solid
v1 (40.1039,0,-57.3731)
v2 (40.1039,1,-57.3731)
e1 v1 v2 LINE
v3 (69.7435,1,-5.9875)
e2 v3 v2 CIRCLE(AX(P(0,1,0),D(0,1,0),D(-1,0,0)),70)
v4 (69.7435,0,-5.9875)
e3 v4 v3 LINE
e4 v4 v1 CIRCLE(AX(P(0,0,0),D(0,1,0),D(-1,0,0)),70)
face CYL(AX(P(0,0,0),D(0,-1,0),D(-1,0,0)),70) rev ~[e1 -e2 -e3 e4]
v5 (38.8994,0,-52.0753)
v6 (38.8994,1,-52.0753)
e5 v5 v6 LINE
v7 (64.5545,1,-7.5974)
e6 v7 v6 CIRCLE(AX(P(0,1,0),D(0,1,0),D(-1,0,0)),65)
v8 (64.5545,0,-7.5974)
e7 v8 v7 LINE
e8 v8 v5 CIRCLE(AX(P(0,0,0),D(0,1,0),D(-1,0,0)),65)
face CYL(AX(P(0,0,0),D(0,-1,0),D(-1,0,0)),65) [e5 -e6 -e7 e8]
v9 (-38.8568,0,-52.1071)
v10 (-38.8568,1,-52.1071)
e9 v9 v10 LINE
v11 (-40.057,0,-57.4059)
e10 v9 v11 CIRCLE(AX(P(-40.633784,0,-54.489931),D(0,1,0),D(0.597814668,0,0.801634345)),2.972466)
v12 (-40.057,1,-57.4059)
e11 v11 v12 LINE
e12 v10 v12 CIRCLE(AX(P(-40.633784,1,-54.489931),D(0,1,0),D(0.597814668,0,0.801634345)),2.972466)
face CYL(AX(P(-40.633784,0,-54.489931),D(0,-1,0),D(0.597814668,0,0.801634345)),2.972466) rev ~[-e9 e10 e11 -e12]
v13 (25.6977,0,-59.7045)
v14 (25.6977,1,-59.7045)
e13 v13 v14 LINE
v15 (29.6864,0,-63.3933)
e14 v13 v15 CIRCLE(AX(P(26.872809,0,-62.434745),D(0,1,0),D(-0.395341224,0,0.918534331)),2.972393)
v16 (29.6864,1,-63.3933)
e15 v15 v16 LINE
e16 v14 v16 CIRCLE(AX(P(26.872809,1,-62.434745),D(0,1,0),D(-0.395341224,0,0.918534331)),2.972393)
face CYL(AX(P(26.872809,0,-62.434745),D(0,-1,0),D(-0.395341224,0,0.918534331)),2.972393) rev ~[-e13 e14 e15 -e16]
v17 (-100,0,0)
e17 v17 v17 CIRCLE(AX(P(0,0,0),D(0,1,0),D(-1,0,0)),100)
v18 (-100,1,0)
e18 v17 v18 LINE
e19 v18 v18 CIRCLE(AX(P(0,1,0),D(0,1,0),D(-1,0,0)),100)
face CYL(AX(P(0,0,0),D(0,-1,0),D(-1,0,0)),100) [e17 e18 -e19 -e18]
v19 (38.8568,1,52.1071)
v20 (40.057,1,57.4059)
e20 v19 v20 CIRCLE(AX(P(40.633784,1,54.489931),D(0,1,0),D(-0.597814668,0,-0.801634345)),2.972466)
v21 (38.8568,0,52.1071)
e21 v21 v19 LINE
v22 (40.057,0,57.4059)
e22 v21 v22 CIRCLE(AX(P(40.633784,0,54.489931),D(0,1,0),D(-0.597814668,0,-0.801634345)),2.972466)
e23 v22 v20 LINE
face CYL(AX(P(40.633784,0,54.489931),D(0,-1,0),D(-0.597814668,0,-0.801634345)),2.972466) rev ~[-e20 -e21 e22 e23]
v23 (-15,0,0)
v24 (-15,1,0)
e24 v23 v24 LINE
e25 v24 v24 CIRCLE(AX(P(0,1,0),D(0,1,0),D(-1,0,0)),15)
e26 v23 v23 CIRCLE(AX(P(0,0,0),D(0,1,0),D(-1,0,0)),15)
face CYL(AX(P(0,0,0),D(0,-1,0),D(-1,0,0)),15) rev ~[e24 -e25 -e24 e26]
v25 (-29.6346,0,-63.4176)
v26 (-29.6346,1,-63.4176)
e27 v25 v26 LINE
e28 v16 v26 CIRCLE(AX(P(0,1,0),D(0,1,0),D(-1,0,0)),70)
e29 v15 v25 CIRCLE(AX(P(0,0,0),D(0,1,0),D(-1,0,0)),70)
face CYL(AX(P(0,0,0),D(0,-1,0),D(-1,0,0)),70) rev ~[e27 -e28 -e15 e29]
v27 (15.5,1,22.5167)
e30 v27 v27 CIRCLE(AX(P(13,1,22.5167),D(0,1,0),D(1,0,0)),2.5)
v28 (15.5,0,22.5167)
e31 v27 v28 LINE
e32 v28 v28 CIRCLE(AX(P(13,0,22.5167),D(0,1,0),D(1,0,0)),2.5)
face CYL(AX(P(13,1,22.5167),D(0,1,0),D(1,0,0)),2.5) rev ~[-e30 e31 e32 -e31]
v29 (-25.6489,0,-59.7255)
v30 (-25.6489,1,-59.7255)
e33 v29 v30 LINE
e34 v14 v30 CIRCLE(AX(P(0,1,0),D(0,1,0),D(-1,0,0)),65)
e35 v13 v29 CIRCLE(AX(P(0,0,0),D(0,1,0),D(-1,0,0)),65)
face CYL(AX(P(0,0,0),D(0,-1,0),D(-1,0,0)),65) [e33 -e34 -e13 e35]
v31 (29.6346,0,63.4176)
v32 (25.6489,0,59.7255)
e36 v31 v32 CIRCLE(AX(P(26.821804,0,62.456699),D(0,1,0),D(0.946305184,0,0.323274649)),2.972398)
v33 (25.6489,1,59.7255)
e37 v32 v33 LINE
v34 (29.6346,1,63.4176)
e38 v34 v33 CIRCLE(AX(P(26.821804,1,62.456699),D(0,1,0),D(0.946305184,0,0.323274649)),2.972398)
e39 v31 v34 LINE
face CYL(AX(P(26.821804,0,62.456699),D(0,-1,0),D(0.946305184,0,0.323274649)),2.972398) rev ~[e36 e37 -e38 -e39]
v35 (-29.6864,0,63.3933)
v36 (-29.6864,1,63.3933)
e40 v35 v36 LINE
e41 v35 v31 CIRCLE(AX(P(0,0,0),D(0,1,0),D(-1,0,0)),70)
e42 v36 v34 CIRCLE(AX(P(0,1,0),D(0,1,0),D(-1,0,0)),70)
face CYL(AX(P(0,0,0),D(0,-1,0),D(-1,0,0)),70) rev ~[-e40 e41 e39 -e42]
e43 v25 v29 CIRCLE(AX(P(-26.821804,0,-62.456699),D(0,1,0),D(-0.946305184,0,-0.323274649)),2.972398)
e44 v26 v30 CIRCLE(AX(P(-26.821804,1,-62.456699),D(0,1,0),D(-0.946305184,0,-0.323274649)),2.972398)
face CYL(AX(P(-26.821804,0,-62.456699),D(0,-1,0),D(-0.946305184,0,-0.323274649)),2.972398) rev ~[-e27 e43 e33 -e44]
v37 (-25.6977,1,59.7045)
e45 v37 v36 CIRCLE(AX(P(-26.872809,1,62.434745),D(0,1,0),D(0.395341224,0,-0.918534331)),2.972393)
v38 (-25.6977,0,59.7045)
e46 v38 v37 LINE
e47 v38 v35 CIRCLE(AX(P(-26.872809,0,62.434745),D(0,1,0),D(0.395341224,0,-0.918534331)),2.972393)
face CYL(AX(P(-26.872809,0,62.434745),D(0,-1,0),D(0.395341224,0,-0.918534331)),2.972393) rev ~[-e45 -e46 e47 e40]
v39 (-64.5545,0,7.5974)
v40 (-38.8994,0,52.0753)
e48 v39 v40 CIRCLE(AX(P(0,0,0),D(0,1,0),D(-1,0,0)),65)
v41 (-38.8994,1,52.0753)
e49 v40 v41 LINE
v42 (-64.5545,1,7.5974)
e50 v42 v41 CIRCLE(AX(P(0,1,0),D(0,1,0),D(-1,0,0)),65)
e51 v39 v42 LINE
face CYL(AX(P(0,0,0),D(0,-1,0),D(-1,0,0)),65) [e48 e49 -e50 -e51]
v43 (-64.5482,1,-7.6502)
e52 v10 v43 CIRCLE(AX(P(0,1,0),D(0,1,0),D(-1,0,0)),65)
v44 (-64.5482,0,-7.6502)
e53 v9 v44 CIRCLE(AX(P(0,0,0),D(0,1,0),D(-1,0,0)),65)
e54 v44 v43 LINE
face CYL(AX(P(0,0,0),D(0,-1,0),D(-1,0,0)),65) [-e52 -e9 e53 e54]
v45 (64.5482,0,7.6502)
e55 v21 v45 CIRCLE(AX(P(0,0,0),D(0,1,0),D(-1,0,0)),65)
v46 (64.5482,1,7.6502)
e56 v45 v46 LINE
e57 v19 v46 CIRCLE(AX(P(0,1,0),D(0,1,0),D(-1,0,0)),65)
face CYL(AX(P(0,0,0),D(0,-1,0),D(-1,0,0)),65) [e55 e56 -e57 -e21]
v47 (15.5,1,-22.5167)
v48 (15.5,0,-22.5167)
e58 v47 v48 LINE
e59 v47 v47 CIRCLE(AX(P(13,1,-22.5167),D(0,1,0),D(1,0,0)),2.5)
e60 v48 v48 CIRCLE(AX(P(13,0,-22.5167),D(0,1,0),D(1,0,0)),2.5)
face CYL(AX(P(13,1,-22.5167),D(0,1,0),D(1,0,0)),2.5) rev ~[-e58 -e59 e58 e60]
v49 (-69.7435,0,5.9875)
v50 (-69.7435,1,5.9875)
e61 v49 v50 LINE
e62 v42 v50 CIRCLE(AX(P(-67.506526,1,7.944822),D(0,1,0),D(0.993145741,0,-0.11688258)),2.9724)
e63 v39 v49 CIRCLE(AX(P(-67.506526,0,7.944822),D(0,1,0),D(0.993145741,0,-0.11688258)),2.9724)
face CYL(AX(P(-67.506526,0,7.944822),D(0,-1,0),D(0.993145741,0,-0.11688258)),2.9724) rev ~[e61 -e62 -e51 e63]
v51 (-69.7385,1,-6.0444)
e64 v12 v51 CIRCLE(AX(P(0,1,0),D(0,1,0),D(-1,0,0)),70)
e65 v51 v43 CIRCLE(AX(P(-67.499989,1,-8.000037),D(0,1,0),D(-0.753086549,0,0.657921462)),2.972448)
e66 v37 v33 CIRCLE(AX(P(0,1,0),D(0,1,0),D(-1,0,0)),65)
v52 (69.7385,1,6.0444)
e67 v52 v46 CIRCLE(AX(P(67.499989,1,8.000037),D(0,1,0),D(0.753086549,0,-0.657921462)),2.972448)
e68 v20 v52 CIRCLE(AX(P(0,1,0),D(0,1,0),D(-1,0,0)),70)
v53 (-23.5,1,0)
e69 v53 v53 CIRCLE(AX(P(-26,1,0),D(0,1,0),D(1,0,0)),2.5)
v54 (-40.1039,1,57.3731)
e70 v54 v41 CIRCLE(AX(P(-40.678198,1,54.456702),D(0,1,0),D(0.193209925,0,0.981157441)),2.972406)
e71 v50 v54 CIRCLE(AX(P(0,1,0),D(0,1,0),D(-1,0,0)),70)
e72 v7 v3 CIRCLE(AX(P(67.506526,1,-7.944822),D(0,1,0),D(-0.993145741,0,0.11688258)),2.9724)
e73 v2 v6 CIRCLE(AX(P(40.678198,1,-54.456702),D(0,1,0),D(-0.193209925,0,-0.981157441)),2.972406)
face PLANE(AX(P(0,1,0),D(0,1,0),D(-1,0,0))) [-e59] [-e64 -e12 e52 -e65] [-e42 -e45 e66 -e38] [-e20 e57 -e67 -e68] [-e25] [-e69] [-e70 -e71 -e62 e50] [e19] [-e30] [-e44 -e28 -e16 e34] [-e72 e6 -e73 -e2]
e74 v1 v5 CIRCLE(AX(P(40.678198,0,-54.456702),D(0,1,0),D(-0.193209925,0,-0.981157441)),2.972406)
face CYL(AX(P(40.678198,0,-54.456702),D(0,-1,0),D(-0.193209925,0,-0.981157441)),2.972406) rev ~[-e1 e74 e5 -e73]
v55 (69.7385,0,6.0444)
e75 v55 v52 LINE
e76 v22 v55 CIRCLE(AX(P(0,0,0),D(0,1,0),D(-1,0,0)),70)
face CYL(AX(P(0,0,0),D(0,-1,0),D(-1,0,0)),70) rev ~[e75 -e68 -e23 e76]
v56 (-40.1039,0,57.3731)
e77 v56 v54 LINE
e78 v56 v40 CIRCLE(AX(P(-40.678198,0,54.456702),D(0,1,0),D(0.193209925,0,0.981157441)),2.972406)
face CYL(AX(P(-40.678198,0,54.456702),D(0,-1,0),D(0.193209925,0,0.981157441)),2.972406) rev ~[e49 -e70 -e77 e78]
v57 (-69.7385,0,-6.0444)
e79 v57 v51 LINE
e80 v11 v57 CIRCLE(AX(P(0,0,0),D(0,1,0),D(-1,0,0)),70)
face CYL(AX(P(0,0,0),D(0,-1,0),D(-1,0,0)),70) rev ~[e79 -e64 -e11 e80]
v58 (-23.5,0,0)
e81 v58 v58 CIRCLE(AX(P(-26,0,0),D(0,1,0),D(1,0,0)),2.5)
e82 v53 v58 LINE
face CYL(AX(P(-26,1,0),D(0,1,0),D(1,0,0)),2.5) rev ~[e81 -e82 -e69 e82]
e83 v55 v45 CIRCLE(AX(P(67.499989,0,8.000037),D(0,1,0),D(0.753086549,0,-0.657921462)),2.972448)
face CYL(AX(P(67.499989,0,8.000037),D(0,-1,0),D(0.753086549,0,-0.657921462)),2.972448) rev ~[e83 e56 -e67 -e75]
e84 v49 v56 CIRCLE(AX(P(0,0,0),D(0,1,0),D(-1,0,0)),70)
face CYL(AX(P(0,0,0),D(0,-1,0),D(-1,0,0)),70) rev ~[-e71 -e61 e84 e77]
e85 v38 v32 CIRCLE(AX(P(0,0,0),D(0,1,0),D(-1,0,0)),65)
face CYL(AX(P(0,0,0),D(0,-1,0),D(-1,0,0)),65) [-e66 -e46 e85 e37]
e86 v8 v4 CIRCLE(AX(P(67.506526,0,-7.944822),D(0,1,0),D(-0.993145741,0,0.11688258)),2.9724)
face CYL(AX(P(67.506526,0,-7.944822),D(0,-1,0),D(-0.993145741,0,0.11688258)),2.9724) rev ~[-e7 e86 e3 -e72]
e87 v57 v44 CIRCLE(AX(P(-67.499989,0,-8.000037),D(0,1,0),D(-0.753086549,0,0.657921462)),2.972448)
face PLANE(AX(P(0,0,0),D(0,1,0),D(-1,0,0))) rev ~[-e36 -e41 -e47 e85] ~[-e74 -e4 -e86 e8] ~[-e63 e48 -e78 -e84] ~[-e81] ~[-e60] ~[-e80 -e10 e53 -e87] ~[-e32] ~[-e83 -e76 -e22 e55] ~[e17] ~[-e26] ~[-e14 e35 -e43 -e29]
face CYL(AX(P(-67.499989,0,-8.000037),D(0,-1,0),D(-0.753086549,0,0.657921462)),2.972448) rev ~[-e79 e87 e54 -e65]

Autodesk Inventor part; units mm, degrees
ref_plane "YZ Plane" through (0, 0, 0) normal (1, 0, 0) x (0, 1, 0)
ref_plane "XZ Plane" through (0, 0, 0) normal (0, 1, 0) x (-1, 0, 0)
ref_plane "XY Plane" through (0, 0, 0) normal (0, 0, 1) x (1, 0, 0)
sketch "Szkic1" plane through (0, 0, 0) normal (0, 1, 0) x (-1, 0, 0)
  circle A0 centre (0, 0) radius 15
  circle A1 centre (0, 0) radius 40
  circle A2 centre (0, 0) radius 100
  circle A3 centre (0, 0) radius 70
  circle A4 centre (0, 0) radius 65
  line L0 (70, 0) -> (65, 0)
  arc A5 (64.5545, 7.5974) -> (69.7435, 5.9875) centre (67.5065, 7.9448) ccw
  arc A6 (69.7385, -6.0444) -> (64.5482, -7.6502) centre (67.5, -8) ccw
  arc A7 (40.1039, 57.3731) -> (38.8994, 52.0753) centre (40.6782, 54.4567) ccw
  arc A8 (25.6977, 59.7045) -> (29.6864, 63.3933) centre (26.8728, 62.4348) ccw
  arc A9 (-29.6346, 63.4176) -> (-25.6489, 59.7255) centre (-26.8218, 62.4567) ccw
  arc A10 (-38.8568, 52.1071) -> (-40.057, 57.4059) centre (-40.6337, 54.4899) ccw
  arc A11 (-69.7385, 6.0444) -> (-64.5482, 7.6502) centre (-67.5, 8) ccw
  arc A12 (-64.5545, -7.5974) -> (-69.7435, -5.9875) centre (-67.5065, -7.9448) ccw
  arc A13 (-40.1039, -57.3731) -> (-38.8994, -52.0753) centre (-40.6782, -54.4567) ccw
  arc A14 (-25.6977, -59.7045) -> (-29.6864, -63.3933) centre (-26.8728, -62.4348) ccw
  arc A15 (29.6346, -63.4176) -> (25.6489, -59.7255) centre (26.8218, -62.4567) ccw
  arc A16 (38.8568, -52.1071) -> (40.057, -57.4059) centre (40.6337, -54.4899) ccw
  point P0 (-29.6346, 63.4176)
  point P1 (29.6864, 63.3933)
  point P2 (-38.8568, 52.1071)
  point P3 (-69.7385, 6.0444)
  point P4 (-40.1039, -57.3731)
  point P5 (-69.7435, -5.9875)
  point P6 (29.6346, -63.4176)
  point P7 (-29.6864, -63.3933)
  point P8 (38.8568, -52.1071)
  point P9 (40.057, -57.4059)
  point P10 (38.8994, 52.0753)
  point P11 (40.1039, 57.3731)
  dimension "d0" = 30
  dimension "d20" = 200
  dimension "d21" = 140
  dimension "d22" = 130
  dimension "d25" = 10
  dimension "d28" = 360
extrude "Wyciągnięcie proste1" add sketch "Szkic1" along normal blind 1 contours A1 | A2 | L0 A4 A5 A3 | A3 A6 A4 L0 | A4 | A7 A4 A8 A3 | A3 A15 A4 A16 | A9 A4 A10 A3 | A3 A13 A4 A14 | A11 A4 A12 A3
sketch "Szkic3" plane through (0, 1, 0) normal (0, 1, 0) x (1, 0, 0)
  circle A0 centre (0, 0) radius 22.5
  circle A1 centre (-26, 0) radius 2.5
  circle A2 centre (13, -22.5167) radius 2.5
  circle A3 centre (13, 22.5167) radius 2.5
  dimension "d42" = 45
  dimension "d46" = 5
  dimension "d50" = 360
  dimension "d54" = 26
extrude "Wyciągnięcie proste3" cut sketch "Szkic3" against normal blind 10 contours A1 | A2 | A3
sketch "Szkic4" plane through (0, 1, 0) normal (0, 1, 0) x (1, 0, 0)
  point P0 (0, 0)
properties part number "Tarcza_Okładzina" material "Stal, węglowa"
